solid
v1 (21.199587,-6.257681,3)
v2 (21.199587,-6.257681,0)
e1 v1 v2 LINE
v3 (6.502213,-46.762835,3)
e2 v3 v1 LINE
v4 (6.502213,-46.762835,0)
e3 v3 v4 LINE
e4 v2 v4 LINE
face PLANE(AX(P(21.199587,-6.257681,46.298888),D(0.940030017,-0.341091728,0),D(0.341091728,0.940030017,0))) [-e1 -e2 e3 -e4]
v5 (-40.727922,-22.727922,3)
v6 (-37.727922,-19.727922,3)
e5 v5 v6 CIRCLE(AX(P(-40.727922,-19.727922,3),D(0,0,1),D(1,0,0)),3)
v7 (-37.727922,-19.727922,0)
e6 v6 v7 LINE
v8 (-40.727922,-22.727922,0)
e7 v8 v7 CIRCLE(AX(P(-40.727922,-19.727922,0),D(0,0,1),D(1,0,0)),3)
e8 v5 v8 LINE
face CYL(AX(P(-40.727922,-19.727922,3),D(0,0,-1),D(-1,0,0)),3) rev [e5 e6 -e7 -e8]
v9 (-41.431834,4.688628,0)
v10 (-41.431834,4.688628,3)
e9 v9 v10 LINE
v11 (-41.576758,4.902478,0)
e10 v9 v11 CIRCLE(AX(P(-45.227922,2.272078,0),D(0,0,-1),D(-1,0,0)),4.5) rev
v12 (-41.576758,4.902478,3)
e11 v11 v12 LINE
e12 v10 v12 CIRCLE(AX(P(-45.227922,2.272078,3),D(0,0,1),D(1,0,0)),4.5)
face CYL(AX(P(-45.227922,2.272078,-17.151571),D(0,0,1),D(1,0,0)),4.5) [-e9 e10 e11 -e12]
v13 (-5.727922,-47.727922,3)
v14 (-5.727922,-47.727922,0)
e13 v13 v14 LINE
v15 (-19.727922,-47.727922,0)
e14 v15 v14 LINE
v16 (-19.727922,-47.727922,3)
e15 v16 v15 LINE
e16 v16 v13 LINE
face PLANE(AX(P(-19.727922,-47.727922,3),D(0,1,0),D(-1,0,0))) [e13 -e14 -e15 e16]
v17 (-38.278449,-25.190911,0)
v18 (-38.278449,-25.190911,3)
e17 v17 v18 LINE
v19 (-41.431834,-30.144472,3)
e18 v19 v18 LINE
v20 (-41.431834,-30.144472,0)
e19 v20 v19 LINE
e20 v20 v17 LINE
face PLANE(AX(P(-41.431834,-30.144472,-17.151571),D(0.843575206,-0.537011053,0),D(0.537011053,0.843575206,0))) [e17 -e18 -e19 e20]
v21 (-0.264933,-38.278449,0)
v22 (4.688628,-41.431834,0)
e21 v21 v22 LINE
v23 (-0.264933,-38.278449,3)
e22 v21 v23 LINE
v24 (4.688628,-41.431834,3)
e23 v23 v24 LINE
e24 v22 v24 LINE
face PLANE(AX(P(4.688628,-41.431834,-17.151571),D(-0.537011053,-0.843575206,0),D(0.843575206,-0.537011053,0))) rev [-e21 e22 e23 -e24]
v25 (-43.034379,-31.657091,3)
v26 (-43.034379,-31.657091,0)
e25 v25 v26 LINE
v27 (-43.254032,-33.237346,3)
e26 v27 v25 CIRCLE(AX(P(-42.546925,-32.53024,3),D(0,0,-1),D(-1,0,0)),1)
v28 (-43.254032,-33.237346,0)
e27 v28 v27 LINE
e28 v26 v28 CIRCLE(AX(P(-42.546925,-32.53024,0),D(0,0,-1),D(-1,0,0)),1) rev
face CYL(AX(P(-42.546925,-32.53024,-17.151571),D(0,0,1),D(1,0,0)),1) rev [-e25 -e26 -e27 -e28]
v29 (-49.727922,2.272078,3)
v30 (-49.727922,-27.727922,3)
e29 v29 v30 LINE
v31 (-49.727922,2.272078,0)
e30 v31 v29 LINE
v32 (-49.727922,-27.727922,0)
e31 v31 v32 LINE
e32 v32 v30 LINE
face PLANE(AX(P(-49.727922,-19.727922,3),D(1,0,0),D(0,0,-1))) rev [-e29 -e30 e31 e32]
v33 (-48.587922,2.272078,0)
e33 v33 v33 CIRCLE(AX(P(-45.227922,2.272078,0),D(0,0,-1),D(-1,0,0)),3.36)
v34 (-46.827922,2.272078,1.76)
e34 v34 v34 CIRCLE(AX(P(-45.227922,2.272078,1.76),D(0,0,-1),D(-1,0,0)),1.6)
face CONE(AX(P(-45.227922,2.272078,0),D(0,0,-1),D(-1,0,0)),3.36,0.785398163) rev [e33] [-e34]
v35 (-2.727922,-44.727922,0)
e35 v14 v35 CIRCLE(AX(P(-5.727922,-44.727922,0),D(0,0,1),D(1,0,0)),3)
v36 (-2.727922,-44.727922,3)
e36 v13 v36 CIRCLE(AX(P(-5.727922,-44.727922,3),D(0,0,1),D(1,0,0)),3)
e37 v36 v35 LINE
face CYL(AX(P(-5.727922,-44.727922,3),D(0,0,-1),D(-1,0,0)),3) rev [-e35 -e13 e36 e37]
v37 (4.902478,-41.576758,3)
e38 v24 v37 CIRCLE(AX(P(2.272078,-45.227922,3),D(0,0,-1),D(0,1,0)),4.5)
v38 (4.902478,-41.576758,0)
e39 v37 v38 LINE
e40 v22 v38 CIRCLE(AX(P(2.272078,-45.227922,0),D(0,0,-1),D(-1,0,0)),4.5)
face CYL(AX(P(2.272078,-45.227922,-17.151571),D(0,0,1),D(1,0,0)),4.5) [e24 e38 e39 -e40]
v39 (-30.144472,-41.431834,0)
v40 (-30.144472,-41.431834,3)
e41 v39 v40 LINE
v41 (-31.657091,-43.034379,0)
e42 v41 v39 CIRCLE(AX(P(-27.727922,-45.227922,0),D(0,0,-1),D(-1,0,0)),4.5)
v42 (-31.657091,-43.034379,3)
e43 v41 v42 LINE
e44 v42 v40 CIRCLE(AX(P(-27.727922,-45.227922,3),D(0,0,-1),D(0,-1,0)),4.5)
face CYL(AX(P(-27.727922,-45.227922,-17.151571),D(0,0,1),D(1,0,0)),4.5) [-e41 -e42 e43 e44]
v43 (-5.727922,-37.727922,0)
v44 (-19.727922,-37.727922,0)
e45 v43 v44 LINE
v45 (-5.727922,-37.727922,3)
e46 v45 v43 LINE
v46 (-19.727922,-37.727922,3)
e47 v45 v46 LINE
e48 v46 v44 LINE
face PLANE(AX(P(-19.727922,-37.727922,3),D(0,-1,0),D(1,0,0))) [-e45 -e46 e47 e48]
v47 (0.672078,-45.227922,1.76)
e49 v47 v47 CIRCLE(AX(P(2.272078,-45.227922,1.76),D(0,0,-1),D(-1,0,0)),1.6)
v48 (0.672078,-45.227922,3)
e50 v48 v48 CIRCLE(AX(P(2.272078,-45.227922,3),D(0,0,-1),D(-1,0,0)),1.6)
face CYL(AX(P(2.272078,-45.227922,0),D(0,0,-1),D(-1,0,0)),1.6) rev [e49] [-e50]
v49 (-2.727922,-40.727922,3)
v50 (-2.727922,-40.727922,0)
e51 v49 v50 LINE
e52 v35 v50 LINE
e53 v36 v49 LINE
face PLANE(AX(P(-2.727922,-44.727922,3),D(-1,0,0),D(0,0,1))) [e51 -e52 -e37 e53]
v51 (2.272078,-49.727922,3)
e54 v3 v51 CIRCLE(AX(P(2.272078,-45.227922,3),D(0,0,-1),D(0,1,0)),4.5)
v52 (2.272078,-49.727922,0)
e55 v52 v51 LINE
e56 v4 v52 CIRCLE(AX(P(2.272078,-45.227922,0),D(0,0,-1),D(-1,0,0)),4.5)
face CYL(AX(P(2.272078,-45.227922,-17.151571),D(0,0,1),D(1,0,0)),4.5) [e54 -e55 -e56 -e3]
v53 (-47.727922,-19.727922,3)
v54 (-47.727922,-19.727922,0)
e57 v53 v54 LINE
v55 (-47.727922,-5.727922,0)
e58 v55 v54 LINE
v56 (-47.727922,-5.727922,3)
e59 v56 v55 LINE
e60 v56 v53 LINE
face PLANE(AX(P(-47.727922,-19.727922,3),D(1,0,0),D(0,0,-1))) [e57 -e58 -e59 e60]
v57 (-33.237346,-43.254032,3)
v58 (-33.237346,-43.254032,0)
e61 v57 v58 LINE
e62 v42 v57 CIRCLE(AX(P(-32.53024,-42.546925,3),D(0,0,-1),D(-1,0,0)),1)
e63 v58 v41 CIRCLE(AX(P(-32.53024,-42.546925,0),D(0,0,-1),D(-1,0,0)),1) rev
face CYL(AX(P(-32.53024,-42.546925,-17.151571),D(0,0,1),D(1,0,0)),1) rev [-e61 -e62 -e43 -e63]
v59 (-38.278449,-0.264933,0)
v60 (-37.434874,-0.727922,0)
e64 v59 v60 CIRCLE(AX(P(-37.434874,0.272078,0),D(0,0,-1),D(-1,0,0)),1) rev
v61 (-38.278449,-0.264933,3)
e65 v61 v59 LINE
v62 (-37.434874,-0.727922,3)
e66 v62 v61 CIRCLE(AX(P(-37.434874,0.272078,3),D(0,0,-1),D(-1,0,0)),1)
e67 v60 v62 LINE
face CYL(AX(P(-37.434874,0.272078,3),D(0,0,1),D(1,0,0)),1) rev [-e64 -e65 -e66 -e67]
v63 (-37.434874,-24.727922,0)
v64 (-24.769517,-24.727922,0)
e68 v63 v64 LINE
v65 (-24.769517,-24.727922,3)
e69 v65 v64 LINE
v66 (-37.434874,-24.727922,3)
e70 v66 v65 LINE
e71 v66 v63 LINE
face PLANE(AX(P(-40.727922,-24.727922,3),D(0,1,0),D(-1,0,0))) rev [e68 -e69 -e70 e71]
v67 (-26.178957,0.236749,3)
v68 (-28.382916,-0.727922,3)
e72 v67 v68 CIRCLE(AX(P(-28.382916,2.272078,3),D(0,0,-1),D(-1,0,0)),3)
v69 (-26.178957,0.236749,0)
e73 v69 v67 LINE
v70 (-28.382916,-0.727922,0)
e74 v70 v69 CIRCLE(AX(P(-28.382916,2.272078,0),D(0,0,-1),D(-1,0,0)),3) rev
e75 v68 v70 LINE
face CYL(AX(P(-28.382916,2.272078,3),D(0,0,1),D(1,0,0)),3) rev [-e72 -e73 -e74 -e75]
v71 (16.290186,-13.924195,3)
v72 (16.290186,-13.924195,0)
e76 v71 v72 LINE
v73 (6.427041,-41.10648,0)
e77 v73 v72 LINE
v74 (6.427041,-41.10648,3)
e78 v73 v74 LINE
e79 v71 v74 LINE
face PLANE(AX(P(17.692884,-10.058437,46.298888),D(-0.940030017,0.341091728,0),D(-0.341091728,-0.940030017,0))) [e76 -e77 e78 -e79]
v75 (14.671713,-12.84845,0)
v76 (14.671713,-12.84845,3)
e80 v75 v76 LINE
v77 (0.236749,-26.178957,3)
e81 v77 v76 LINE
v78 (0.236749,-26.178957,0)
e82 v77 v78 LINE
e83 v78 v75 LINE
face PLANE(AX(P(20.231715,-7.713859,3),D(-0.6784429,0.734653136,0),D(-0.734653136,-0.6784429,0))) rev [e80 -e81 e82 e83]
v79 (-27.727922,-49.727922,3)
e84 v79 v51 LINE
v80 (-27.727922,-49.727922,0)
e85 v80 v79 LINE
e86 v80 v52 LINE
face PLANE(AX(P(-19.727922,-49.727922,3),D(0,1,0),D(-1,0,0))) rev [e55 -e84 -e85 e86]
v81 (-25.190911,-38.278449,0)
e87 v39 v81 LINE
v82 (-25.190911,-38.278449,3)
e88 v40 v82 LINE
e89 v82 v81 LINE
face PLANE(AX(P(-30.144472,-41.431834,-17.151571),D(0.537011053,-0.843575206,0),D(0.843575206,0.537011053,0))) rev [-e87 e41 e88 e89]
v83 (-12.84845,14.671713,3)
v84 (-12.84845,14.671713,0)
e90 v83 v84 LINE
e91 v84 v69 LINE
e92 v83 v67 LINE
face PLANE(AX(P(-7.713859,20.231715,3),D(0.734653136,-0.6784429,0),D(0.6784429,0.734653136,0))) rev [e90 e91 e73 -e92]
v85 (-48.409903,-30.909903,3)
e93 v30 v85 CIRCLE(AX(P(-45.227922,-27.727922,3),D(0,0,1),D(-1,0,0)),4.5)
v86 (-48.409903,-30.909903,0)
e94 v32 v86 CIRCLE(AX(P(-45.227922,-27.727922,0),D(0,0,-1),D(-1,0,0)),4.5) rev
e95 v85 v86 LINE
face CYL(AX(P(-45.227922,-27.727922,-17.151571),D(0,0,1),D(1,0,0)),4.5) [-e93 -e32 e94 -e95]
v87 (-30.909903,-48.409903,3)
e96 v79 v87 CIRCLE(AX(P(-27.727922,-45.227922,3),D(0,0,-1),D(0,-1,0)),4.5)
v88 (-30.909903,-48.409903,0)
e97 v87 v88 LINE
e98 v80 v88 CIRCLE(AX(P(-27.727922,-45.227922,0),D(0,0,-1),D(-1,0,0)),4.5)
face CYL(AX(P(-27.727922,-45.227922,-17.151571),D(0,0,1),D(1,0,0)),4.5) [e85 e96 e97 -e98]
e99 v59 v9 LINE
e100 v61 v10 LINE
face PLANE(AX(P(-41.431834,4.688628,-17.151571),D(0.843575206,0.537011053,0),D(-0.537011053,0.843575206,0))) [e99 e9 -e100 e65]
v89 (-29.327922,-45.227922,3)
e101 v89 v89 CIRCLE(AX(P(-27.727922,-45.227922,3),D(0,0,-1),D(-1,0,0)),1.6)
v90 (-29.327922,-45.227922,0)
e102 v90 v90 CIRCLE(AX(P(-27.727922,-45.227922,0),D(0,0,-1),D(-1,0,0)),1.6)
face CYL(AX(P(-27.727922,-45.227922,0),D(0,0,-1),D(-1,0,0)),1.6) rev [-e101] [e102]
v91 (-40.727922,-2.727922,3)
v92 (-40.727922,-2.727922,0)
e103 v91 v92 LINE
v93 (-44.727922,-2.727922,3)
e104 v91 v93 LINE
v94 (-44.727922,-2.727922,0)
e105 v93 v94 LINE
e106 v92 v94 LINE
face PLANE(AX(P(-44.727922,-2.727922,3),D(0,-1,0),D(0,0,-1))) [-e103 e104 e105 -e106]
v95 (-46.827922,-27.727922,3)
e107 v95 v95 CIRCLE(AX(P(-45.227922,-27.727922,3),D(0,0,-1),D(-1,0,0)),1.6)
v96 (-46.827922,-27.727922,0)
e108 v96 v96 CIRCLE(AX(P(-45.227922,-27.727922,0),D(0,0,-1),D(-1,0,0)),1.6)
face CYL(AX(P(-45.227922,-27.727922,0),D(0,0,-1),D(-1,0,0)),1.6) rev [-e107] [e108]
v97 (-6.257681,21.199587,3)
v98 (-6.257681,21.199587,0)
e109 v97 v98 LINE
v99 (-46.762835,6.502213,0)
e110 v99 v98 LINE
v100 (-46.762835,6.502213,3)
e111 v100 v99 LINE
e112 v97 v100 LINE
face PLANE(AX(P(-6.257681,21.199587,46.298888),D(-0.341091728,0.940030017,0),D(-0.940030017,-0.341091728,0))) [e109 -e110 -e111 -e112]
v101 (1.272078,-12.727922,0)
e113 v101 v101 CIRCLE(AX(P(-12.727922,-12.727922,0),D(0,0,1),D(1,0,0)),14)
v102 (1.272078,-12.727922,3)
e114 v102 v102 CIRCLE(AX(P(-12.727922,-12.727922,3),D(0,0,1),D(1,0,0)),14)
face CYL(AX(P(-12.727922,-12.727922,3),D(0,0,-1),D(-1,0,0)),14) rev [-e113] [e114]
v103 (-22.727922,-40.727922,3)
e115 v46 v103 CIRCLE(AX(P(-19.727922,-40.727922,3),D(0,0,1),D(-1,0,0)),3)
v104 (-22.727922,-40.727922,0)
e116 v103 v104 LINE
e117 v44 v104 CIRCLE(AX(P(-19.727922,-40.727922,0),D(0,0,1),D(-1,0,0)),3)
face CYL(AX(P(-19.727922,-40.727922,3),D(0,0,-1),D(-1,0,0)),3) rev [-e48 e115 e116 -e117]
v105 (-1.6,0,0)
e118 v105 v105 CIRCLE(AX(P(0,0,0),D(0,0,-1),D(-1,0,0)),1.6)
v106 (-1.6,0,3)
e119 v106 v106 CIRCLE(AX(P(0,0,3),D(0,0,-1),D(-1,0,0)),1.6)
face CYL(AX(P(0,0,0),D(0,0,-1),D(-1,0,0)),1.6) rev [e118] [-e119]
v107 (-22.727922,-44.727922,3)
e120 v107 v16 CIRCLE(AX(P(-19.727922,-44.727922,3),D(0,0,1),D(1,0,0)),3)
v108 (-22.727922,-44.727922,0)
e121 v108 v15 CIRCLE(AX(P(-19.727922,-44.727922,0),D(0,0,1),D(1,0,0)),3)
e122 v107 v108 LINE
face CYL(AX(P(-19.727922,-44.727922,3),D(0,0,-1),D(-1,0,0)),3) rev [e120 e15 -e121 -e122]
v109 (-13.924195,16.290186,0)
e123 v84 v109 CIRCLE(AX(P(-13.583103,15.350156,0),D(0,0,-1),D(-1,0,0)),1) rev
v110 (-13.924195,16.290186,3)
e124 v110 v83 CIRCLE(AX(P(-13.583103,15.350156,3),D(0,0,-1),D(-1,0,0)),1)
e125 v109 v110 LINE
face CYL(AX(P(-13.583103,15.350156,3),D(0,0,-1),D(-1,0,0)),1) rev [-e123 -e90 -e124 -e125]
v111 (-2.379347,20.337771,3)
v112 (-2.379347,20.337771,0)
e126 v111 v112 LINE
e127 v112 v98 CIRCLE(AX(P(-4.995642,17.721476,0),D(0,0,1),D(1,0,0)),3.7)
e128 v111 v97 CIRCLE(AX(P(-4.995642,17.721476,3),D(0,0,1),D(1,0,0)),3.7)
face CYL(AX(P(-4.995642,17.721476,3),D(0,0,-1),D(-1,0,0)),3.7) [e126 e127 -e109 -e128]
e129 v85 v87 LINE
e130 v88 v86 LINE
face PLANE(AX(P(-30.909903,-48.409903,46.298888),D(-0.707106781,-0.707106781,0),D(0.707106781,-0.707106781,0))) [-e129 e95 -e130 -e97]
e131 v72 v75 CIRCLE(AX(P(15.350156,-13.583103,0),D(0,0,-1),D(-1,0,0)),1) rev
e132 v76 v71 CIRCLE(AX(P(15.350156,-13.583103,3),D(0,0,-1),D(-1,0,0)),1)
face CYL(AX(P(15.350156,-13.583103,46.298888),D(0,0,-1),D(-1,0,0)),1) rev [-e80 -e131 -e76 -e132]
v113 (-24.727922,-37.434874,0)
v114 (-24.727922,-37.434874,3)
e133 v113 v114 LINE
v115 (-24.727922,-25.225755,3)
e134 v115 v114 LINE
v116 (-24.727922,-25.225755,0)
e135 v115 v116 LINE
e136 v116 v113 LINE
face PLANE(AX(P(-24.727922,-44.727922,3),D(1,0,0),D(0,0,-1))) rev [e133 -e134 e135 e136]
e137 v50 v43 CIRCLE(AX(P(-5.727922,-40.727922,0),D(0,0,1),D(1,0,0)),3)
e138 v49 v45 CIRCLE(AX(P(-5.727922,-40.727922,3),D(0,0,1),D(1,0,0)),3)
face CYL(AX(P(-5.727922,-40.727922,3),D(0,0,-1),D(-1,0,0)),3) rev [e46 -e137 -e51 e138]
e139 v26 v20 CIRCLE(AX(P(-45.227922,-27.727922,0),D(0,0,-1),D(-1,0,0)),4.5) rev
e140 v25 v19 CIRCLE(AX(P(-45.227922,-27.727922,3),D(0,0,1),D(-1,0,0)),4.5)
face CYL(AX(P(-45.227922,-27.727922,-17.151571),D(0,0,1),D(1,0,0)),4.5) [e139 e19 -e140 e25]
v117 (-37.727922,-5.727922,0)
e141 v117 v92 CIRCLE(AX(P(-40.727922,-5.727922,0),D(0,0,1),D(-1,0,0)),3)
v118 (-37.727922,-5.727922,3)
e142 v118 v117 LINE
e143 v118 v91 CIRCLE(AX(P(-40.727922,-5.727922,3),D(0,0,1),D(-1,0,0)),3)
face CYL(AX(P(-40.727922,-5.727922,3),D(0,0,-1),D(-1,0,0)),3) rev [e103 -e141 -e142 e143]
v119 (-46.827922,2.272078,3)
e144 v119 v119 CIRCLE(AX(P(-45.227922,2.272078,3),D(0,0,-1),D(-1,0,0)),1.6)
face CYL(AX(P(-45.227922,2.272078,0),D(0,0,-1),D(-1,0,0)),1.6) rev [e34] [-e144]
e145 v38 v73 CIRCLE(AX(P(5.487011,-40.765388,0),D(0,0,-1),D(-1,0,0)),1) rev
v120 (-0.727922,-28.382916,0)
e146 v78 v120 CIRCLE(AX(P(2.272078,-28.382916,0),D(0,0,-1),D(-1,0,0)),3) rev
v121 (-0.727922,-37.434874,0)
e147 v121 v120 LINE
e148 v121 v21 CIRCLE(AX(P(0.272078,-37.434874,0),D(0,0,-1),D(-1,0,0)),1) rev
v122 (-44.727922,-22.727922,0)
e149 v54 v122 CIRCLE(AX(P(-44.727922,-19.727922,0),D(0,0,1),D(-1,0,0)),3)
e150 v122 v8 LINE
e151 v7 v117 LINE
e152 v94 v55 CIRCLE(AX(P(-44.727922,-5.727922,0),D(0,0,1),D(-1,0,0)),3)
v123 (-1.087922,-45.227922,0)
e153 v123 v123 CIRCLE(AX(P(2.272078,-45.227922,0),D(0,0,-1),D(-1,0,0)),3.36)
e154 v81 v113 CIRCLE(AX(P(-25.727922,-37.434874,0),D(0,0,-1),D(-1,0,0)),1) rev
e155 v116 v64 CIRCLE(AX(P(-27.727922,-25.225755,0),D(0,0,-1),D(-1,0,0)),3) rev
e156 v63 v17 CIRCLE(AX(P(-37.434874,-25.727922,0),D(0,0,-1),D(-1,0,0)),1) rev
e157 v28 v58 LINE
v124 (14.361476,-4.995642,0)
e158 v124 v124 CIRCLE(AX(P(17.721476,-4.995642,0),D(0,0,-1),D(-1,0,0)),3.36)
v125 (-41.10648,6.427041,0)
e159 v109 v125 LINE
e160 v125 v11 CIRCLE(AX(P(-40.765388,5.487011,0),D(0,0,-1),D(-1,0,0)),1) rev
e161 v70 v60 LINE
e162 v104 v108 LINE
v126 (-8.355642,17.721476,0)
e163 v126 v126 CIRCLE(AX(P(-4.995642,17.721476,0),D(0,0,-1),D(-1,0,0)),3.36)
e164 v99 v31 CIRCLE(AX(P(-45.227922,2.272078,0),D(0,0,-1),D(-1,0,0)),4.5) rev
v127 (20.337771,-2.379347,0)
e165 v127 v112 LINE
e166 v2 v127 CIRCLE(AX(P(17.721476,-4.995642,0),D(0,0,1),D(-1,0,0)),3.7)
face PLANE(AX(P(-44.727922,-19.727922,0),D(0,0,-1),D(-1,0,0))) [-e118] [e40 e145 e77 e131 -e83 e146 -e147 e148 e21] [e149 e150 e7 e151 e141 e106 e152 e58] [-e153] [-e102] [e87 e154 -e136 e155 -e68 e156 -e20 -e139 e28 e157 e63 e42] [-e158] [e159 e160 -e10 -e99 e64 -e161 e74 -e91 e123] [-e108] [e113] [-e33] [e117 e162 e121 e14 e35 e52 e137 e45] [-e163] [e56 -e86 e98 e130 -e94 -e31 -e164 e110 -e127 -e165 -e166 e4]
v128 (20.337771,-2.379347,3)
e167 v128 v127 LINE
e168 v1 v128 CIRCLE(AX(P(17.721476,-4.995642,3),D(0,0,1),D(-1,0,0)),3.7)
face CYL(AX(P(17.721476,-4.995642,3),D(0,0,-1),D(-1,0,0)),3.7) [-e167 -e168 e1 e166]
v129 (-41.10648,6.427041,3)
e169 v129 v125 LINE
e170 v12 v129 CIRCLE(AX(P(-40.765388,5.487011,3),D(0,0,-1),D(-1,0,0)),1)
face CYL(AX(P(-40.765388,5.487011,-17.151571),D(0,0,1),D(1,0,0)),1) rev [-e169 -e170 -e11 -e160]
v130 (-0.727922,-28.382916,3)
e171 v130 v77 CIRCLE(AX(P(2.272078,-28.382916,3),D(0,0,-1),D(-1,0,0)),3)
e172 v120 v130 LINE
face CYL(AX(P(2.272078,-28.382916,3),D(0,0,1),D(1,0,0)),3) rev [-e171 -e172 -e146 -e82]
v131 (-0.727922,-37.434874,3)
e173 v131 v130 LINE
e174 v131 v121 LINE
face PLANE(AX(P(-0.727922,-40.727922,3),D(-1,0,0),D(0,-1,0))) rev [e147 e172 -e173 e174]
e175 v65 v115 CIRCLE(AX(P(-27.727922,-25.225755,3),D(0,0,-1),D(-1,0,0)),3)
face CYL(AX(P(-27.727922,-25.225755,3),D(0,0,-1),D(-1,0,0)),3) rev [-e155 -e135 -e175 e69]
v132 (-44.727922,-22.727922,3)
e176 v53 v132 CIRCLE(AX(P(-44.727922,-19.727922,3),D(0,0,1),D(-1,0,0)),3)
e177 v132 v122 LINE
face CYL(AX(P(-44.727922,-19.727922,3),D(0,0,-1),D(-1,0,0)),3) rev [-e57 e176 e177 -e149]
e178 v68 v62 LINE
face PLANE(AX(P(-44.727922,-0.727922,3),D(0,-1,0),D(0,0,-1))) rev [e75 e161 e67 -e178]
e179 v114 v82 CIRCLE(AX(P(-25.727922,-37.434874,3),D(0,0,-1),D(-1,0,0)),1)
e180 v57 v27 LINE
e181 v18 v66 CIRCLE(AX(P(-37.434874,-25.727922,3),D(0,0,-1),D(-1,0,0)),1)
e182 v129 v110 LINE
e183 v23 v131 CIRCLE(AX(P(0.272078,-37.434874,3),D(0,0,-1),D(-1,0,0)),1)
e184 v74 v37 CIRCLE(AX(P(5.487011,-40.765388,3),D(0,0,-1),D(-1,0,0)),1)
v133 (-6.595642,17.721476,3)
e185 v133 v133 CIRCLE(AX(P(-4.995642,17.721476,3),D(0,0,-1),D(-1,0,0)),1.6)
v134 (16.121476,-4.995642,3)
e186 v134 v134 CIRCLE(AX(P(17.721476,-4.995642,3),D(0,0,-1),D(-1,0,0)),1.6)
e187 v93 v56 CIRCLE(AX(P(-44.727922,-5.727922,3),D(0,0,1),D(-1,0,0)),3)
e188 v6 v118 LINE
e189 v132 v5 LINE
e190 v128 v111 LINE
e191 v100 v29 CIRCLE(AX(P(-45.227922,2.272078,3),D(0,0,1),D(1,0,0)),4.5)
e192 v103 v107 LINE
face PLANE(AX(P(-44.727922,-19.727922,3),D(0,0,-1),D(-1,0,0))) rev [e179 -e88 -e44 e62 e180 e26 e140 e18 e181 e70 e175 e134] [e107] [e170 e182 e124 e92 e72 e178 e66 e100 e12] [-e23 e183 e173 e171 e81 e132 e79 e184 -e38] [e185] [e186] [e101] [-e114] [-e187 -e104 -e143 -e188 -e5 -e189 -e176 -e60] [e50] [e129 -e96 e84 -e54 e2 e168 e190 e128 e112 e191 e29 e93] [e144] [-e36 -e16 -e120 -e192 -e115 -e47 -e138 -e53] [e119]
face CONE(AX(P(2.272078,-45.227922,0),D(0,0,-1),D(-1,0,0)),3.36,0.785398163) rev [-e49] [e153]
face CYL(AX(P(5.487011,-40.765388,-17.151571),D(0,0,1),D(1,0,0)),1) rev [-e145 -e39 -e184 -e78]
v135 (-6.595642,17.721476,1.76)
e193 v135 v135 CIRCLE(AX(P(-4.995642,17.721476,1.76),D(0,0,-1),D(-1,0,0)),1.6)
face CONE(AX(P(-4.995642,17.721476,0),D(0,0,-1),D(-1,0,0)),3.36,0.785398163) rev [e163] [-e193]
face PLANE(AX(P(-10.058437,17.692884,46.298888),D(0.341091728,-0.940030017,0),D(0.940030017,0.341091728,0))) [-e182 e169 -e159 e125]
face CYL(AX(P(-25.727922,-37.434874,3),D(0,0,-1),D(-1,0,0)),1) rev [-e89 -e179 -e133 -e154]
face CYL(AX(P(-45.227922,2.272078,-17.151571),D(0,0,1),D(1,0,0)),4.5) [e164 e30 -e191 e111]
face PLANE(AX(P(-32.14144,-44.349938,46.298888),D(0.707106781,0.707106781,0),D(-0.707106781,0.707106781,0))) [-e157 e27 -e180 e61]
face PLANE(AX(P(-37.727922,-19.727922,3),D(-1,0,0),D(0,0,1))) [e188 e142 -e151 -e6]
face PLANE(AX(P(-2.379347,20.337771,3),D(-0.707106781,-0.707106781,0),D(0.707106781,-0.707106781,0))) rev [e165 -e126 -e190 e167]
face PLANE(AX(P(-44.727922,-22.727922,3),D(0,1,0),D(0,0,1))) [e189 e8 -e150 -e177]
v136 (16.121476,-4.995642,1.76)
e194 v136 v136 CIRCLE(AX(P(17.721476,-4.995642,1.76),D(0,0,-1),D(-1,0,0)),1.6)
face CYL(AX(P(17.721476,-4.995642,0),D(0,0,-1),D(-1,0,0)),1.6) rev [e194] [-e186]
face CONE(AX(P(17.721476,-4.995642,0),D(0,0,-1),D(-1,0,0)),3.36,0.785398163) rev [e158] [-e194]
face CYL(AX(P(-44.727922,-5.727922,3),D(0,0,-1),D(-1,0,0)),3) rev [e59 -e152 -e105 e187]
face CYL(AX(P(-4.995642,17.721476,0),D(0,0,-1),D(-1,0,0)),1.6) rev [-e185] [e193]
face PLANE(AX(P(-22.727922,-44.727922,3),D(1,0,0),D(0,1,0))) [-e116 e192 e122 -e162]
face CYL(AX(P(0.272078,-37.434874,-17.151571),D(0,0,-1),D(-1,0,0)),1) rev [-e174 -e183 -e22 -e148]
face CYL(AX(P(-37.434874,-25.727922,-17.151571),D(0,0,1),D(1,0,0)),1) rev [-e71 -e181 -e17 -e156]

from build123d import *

# Parameters (mm, degrees)
SKETCH1_R                    = 14
BOSS_EXTRUDE1_DEPTH          = 3
FILLET1_R                    = 3
M3_CLEARANCE_HOLE1_D         = 3.2
CSK_FOR_M3_SFHCS1_AT_2_COUNT = 2
CSK_FOR_M3_SFHCS1_AT_2_PITCH = 32.126856443
BOSS_EXTRUDE3_START          = -3
BOSS_EXTRUDE3_DEPTH          = 3
M3_CLEARANCE_HOLE2_D         = 3.2
BOSS_EXTRUDE4_DEPTH          = 3
FILLET2_R                    = 1


with BuildPart() as part:
    # Sketch1 → Boss-Extrude1 (new body)
    with BuildSketch(Plane.XY):
        with BuildLine():
            Line((-7.713858659, 20.231714727), (-27.069818728, -0.727922061))
            Line((-27.069818728, -0.727922061), (-40.727922061, -0.727922061))
            Line((-40.727922061, -0.727922061), (-44.727922061, -0.727922061))
            ThreePointArc((-44.727922061, -0.727922061), (-48.263455967, -2.192388155), (-49.727922061, -5.727922061))
            Line((-49.727922061, -5.727922061), (-49.727922061, -19.727922061))
            ThreePointArc((-49.727922061, -19.727922061), (-48.263455967, -23.263455967), (-44.727922061, -24.727922061))
            Line((-44.727922061, -24.727922061), (-40.727922061, -24.727922061))
            Line((-40.727922061, -24.727922061), (-24.76951664, -24.727922061))
            ThreePointArc((-24.76951664, -24.727922061), (-24.748737342, -24.748737342), (-24.727922061, -24.76951664))
            Line((-24.727922061, -24.76951664), (-24.727922061, -40.727922061))
            Line((-24.727922061, -40.727922061), (-24.727922061, -44.727922061))
            ThreePointArc((-24.727922061, -44.727922061), (-23.263455967, -48.263455967), (-19.727922061, -49.727922061))
            Line((-19.727922061, -49.727922061), (-5.727922061, -49.727922061))
            ThreePointArc((-5.727922061, -49.727922061), (-2.192388155, -48.263455967), (-0.727922061, -44.727922061))
            Line((-0.727922061, -44.727922061), (-0.727922061, -40.727922061))
            Line((-0.727922061, -40.727922061), (-0.727922061, -27.069818728))
            Line((-0.727922061, -27.069818728), (20.231714727, -7.713858659))
            ThreePointArc((20.231714727, -7.713858659), (21.420744979, -5.069187867), (20.337771086, -2.379346963))
            Line((20.337771086, -2.379346963), (-2.379346963, 20.337771086))
            ThreePointArc((-2.379346963, 20.337771086), (-5.069187867, 21.420744979), (-7.713858659, 20.231714727))
        make_face()
        with Locations((-12.727922061, -12.727922061)):
            Circle(SKETCH1_R, mode=Mode.SUBTRACT)
        with BuildLine():
            Line((-44.727922061, -22.727922061), (-40.727922061, -22.727922061))
            ThreePointArc((-40.727922061, -22.727922061), (-38.606601718, -21.849242405), (-37.727922061, -19.727922061))
            Line((-37.727922061, -19.727922061), (-37.727922061, -5.727922061))
            ThreePointArc((-37.727922061, -5.727922061), (-38.606601718, -3.606601718), (-40.727922061, -2.727922061))
            Line((-40.727922061, -2.727922061), (-44.727922061, -2.727922061))
            ThreePointArc((-44.727922061, -2.727922061), (-46.849242405, -3.606601718), (-47.727922061, -5.727922061))
            Line((-47.727922061, -5.727922061), (-47.727922061, -19.727922061))
            ThreePointArc((-47.727922061, -19.727922061), (-46.849242405, -21.849242405), (-44.727922061, -22.727922061))
        make_face(mode=Mode.SUBTRACT)
        with BuildLine():
            Line((-19.727922061, -37.727922061), (-5.727922061, -37.727922061))
            ThreePointArc((-5.727922061, -37.727922061), (-3.606601718, -38.606601718), (-2.727922061, -40.727922061))
            Line((-2.727922061, -40.727922061), (-2.727922061, -44.727922061))
            ThreePointArc((-2.727922061, -44.727922061), (-3.606601718, -46.849242405), (-5.727922061, -47.727922061))
            Line((-5.727922061, -47.727922061), (-19.727922061, -47.727922061))
            ThreePointArc((-19.727922061, -47.727922061), (-21.849242405, -46.849242405), (-22.727922061, -44.727922061))
            Line((-22.727922061, -44.727922061), (-22.727922061, -40.727922061))
            ThreePointArc((-22.727922061, -40.727922061), (-21.849242405, -38.606601718), (-19.727922061, -37.727922061))
        make_face(mode=Mode.SUBTRACT)
    extrude(amount=BOSS_EXTRUDE1_DEPTH)

    # Fillet1
    # the kernel refuses this fillet: 3 mm, written as the material it adds along each edge
    with BuildSketch(Plane(origin=(-0.727922061, -27.069818728, 0), x_dir=(0.734653136445674, 0.6784429004054313, 0), z_dir=(0, 0, 1)), Plane(origin=(-27.069818728, -0.727922061, 0), x_dir=(-1, 0, 0), z_dir=(0, 0, 1))) as fillet1_piece_1:
        with BuildLine():
            CenterArc((FILLET1_R * 0.437699212924, -FILLET1_R), FILLET1_R, 90, 47.277914711)
            Line((-FILLET1_R * 0.296953923521, -FILLET1_R * 0.321557099595), (-FILLET1_R * 0.31164698625, -FILLET1_R * 0.307988241586))
            Line((-FILLET1_R * 0.31164698625, -FILLET1_R * 0.307988241586), (-FILLET1_R * 0.00875398425848, FILLET1_R * 0.02))
            Line((-FILLET1_R * 0.00875398425848, FILLET1_R * 0.02), (FILLET1_R * 0.437699212924, FILLET1_R * 0.02))
            Line((FILLET1_R * 0.437699212924, FILLET1_R * 0.02), (FILLET1_R * 0.437699212924, 0))
        make_face()
    extrude(amount=3)
    with BuildSketch(Plane(origin=(-24.727922061, -24.76951664, 0), x_dir=(-0.7071067811869401, 0.707106781186155, 0), z_dir=(0, 0, 1))) as fillet1_piece_2:
        with BuildLine():
            CenterArc((1.798711298, 2.443929389), FILLET1_R, 225, 9.552090636)
            Line((-0.322609046, 0.322609046), (-0.365035452, 0.280182639))
            Line((-0.365035452, 0.280182639), (-0.042426407, -0.042426407))
            Line((-0.042426407, -0.042426407), (0.000103806, -0.05999991))
            ThreePointArc((0.000103806, -0.05999991), (0.029411809, -0.059974557), (0.024025864, -0.048878588))
            Line((0.024025864, -0.048878588), (0.058823617, 0))
        make_face()
    extrude(amount=3)

    # M3 Clearance Hole1 (through all)
    with Locations(Plane(origin=(0, 0, 0), x_dir=(-1, 0, 0), z_dir=(0, 0, -1))):
        with Locations((0, 0)):
            Hole(M3_CLEARANCE_HOLE1_D / 2)

    # Sketch5 → CSK for M3 SFHCS1 (revolve, cut)
    with BuildSketch(Plane(origin=(-4.995642054, 17.721475995, 0), x_dir=(0, 1, 0), z_dir=(1, 0, 0))):
        Polygon((0, 0), (0, 3), (1.6, 3), (1.6, 1.76), (3.36, 0), align=None)
    csk_for_m3_sfhcs1 = revolve(axis=Axis((-4.995642054, 17.721475995, -6.35), (0, 0, 1)), mode=Mode.SUBTRACT)

    # CSK for M3 SFHCS1 at 2: CSK for M3 SFHCS1 ×2
    with Locations(*[Vector(0.7071067811865475, -0.7071067811865477, 0) * (i * CSK_FOR_M3_SFHCS1_AT_2_PITCH) for i in range(1, CSK_FOR_M3_SFHCS1_AT_2_COUNT)]):
        add(csk_for_m3_sfhcs1, mode=Mode.SUBTRACT)

    # Sketch8 → Boss-Extrude3 (add)
    with BuildSketch(Plane.XY.offset(3).offset(BOSS_EXTRUDE3_START)):
        with BuildLine():
            Line((-49.727922061, 2.272077939), (-49.727922061, -5.727922061))
            ThreePointArc((-49.727922061, -5.727922061), (-48.263455967, -2.192388155), (-44.727922061, -0.727922061))
            Line((-44.727922061, -0.727922061), (-37.983715361, -0.727922061))
            Line((-37.983715361, -0.727922061), (-41.431833634, 4.688627679))
            ThreePointArc((-41.431833634, 4.688627679), (-46.486413634, 6.592517611), (-49.727922061, 2.272077939))
        make_face()
        with BuildLine():
            Line((-41.431833634, -30.144471802), (-37.983715361, -24.727922061))
            Line((-37.983715361, -24.727922061), (-44.727922061, -24.727922061))
            ThreePointArc((-44.727922061, -24.727922061), (-48.263455967, -23.263455967), (-49.727922061, -19.727922061))
            Line((-49.727922061, -19.727922061), (-49.727922061, -27.727922061))
            ThreePointArc((-49.727922061, -27.727922061), (-46.486413634, -32.048361734), (-41.431833634, -30.144471802))
        make_face()
    boss_extrude3 = extrude(amount=BOSS_EXTRUDE3_DEPTH)

    # Sketch10 → CSK for M3 SFHCS2 (revolve, cut)
    with BuildSketch(Plane(origin=(-45.227922061, 2.272077939, 0), x_dir=(0, 1, 0), z_dir=(1, 0, 0))):
        Polygon((0, 0), (0, 3), (1.6, 3), (1.6, 1.76), (3.36, 0), align=None)
    csk_for_m3_sfhcs2 = revolve(axis=Axis((-45.227922061, 2.272077939, -6.35), (0, 0, 1)), mode=Mode.SUBTRACT)

    # M3 Clearance Hole2 (through all)
    with Locations(Plane(origin=(0, 0, 0), x_dir=(-1, 0, 0), z_dir=(0, 0, -1))):
        with Locations((45.227922061, -27.727922061)):
            m3_clearance_hole2 = Hole(M3_CLEARANCE_HOLE2_D / 2)

    # Mirror1: Boss-Extrude3, CSK for M3 SFHCS2, M3 Clearance Hole2 across plane
    add(boss_extrude3.mirror(Plane(origin=(0, 0, 0), x_dir=(0, 0, 1), z_dir=(-0.7071067811865475, 0.7071067811865477, 0))))
    add(csk_for_m3_sfhcs2.mirror(Plane(origin=(0, 0, 0), x_dir=(0, 0, 1), z_dir=(-0.7071067811865475, 0.7071067811865477, 0))), mode=Mode.SUBTRACT)
    add(m3_clearance_hole2.mirror(Plane(origin=(0, 0, 0), x_dir=(0, 0, 1), z_dir=(-0.7071067811865475, 0.7071067811865477, 0))), mode=Mode.SUBTRACT)

    # Sketch13 → Boss-Extrude4 (add)
    with BuildSketch(Plane(origin=(0, 0, 0), x_dir=(-1, 0, 0), z_dir=(0, 0, -1))):
        with BuildLine():
            Line((-21.199587058, -6.257681448), (-6.502213015, -46.762834838))
            ThreePointArc((-6.502213015, -46.762834838), (-6.726271236, -44.587483093), (-5.898401366, -42.563381125))
            Line((-5.898401366, -42.563381125), (-17.692883881, -10.058436905))
            Line((-17.692883881, -10.058436905), (-20.231714727, -7.713858659))
            ThreePointArc((-20.231714727, -7.713858659), (-20.802903641, -7.043764039), (-21.199587058, -6.257681448))
        make_face()
        with BuildLine():
            Line((10.058436905, 17.692883881), (7.713858659, 20.231714727))
            ThreePointArc((7.713858659, 20.231714727), (7.043764039, 20.802903641), (6.257681448, 21.199587058))
            Line((6.257681448, 21.199587058), (46.762834838, 6.502213015))
            ThreePointArc((46.762834838, 6.502213015), (44.587483093, 6.726271236), (42.563381125, 5.898401366))
            Line((42.563381125, 5.898401366), (10.058436905, 17.692883881))
        make_face()
        with BuildLine():
            Line((30.909902577, -48.409902577), (48.409902577, -30.909902577))
            ThreePointArc((48.409902577, -30.909902577), (46.534165101, -32.034165101), (44.349937703, -32.141440325))
            Line((44.349937703, -32.141440325), (32.141440325, -44.349937703))
            ThreePointArc((32.141440325, -44.349937703), (32.034165101, -46.534165101), (30.909902577, -48.409902577))
        make_face()
    extrude(amount=-BOSS_EXTRUDE4_DEPTH)

    # Fillet2
    fillet2_edges = [part.edges().sort_by_distance(p)[0] for p in [
        (-37.983715361, -0.727922061, 1.5),
        (-37.983715361, -24.727922061, 1.5),
        (-0.727922061, -37.983715361, 1.5),
        (-24.727922061, -37.983715361, 1.5),
        (17.692883881, -10.058436905, 1.5),
        (5.898401366, -42.563381125, 1.5),
        (-42.563381125, 5.898401366, 1.5),
        (-10.058436905, 17.692883881, 1.5),
        (-32.141440325, -44.349937703, 1.5),
        (-44.349937703, -32.141440325, 1.5),
    ]]
    fillet(fillet2_edges, radius=FILLET2_R)


solid = part.part
